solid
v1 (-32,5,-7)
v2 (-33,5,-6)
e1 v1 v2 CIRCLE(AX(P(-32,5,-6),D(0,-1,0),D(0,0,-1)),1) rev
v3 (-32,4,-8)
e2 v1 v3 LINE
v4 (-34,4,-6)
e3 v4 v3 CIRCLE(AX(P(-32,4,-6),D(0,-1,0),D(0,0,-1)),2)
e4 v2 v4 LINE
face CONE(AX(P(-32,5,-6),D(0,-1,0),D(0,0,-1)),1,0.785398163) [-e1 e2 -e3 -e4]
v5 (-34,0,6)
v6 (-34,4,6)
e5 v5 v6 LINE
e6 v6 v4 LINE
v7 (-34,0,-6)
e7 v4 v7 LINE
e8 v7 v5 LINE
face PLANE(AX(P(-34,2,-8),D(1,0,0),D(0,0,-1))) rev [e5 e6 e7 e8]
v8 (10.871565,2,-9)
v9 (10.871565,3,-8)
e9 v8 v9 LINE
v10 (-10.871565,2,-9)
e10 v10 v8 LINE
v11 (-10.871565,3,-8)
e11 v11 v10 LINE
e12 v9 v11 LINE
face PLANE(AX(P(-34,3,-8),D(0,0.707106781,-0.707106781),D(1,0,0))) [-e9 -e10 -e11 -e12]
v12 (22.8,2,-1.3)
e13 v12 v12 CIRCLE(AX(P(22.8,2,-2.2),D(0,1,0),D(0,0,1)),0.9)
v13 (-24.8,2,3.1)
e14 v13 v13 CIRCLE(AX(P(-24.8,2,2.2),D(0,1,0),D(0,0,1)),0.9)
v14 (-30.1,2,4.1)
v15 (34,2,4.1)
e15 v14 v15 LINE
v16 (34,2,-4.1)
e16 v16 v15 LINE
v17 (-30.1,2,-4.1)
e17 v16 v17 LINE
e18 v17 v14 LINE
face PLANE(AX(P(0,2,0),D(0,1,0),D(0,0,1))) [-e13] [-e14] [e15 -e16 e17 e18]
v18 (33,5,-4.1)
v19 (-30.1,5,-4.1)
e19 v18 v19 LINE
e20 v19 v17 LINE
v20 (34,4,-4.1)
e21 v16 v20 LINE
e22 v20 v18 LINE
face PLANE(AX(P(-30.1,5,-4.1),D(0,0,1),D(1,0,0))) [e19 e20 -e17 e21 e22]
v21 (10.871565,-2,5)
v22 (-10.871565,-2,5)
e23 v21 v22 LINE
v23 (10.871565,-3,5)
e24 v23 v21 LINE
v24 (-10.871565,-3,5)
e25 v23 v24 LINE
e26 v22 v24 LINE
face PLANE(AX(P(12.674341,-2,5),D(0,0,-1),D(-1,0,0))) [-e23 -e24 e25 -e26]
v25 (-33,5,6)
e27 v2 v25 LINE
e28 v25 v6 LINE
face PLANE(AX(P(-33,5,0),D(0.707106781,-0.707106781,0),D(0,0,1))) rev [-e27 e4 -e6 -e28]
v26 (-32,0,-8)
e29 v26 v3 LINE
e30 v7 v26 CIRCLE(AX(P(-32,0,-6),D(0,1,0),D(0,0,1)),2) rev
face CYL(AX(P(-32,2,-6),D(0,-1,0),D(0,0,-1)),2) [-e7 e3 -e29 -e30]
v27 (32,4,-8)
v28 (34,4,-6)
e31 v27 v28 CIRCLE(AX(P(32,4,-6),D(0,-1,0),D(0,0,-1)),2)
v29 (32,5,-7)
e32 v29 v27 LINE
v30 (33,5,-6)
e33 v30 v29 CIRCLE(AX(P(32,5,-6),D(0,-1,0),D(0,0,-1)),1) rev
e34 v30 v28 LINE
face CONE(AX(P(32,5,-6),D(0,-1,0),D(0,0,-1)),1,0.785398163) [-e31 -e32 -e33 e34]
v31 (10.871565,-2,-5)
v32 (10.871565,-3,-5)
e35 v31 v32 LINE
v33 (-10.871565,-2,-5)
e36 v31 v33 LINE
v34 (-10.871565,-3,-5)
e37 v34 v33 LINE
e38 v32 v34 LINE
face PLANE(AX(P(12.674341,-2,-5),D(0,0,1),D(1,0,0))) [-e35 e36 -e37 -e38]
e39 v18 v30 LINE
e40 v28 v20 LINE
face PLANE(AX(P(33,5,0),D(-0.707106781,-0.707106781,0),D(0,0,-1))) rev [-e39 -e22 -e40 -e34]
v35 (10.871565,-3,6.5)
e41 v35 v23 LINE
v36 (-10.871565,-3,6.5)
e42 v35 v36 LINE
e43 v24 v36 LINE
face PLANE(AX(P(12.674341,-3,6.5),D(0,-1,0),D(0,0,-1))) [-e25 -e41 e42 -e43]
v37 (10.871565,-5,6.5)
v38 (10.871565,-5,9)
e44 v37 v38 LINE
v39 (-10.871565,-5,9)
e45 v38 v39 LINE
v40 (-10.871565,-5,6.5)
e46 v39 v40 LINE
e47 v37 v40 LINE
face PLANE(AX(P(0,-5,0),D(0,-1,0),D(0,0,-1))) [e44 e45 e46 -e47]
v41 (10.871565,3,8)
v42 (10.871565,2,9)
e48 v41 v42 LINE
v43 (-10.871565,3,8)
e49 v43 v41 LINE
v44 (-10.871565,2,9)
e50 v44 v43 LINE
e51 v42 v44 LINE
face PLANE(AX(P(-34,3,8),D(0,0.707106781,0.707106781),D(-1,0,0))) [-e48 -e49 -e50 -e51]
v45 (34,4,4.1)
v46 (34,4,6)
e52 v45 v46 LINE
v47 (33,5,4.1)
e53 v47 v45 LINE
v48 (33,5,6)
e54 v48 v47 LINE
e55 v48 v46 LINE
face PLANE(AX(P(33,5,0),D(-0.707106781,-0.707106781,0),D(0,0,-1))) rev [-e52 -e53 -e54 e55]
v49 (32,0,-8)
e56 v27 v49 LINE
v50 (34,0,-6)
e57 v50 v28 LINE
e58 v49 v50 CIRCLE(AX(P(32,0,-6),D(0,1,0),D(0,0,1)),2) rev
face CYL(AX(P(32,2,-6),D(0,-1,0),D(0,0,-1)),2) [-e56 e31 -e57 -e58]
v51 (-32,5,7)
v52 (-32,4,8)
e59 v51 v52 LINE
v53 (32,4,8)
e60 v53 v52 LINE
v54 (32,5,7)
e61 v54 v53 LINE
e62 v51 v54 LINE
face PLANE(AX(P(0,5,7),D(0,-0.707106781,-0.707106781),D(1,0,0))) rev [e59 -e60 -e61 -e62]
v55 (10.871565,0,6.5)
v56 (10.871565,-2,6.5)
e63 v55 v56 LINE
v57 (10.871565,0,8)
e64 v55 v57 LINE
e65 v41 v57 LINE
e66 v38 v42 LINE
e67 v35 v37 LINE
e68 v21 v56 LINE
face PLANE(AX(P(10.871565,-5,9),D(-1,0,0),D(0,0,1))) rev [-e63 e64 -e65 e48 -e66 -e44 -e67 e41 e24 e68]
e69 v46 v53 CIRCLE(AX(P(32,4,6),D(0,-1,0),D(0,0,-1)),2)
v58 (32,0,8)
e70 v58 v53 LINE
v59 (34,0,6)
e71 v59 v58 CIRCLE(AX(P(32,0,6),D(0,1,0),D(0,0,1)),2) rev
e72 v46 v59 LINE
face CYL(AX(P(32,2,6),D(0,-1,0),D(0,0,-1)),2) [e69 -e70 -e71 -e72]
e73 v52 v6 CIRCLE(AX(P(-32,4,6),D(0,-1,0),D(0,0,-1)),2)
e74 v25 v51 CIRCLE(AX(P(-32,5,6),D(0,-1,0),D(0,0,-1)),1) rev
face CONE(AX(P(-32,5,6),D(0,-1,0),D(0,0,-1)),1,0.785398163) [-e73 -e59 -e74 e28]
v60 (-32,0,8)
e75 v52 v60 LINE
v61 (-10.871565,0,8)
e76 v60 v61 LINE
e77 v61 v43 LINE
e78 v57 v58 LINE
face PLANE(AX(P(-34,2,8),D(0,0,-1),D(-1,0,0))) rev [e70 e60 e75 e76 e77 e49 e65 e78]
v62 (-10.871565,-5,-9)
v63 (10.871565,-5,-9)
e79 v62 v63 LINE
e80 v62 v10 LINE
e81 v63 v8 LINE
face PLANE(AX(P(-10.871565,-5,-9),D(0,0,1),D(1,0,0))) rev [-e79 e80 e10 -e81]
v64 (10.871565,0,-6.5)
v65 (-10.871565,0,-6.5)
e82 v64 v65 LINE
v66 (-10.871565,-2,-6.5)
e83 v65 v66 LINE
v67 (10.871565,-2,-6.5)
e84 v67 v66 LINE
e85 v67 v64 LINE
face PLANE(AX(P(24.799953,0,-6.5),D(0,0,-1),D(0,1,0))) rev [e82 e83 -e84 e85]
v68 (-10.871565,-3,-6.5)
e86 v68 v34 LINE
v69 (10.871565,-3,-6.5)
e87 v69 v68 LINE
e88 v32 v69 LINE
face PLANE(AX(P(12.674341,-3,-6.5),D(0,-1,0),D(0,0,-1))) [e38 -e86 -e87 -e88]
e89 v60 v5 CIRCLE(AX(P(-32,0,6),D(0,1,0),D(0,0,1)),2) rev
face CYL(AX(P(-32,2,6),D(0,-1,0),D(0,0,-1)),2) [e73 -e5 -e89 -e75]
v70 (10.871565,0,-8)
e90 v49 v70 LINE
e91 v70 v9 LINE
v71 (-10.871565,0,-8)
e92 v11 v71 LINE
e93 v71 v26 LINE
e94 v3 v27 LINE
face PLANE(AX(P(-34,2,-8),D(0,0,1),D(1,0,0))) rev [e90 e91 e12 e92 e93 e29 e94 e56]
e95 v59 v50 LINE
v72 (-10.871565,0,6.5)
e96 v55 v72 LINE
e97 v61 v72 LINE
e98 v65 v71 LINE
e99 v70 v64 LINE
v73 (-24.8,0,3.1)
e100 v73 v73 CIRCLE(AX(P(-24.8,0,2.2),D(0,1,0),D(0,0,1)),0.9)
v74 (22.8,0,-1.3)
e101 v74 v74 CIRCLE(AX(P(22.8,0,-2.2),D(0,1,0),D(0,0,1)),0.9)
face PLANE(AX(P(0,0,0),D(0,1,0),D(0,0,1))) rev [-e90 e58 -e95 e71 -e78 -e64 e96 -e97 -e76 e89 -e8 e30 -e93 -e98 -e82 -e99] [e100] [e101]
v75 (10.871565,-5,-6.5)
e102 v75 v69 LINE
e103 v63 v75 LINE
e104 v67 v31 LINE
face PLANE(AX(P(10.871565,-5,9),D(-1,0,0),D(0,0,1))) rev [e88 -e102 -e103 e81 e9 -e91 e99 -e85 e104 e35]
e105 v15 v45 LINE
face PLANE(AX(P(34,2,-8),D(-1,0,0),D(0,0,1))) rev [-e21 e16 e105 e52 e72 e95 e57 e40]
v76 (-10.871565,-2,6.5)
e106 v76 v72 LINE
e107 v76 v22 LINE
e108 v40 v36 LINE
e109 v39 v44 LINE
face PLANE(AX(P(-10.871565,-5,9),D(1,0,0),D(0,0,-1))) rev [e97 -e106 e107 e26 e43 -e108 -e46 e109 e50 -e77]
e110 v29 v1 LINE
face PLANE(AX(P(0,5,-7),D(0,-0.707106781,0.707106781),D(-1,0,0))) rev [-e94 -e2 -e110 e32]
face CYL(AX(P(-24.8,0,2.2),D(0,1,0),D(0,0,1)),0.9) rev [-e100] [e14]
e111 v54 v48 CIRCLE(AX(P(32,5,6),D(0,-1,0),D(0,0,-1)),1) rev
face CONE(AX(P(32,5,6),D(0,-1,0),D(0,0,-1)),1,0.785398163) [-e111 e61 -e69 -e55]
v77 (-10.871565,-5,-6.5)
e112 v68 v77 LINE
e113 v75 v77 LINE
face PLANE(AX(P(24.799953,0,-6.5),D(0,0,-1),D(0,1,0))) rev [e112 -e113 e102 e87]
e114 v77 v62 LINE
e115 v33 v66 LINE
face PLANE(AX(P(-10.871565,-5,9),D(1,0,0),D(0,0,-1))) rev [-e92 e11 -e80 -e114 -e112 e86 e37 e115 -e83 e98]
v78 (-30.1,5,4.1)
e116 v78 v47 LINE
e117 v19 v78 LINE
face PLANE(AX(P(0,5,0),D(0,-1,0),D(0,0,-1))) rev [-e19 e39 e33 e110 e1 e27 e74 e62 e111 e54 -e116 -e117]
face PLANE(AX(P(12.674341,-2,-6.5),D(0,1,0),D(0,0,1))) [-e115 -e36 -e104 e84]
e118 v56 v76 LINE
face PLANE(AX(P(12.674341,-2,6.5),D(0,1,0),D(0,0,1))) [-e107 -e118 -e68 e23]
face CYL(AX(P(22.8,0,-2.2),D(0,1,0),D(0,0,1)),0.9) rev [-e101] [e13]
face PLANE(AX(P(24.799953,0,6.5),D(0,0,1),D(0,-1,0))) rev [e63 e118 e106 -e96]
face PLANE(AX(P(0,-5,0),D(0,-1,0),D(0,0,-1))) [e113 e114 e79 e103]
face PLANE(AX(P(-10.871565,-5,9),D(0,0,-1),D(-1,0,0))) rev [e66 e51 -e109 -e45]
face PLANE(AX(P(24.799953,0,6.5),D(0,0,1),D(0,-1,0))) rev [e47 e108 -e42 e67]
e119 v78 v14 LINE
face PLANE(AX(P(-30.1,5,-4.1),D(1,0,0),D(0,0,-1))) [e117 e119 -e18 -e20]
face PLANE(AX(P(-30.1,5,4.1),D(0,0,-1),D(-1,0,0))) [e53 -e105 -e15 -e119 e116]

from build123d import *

# Parameters (mm, degrees)
SKETCH2_W           = 68
SKETCH2_H           = 16
BOSS_EXTRUDE1_DEPTH = 2
SKETCH3_W           = 68
SKETCH3_H           = 16
SKETCH3_W_2         = 60.2
SKETCH3_H_2         = 8.2
BOSS_EXTRUDE2_DEPTH = 3
SKETCH4_R           = 0.9
CUT_EXTRUDE1_DEPTH  = 36.057096286
SKETCH5_W           = 21.74313044
SKETCH5_H           = 18
BOSS_EXTRUDE3_DEPTH = 5
SKETCH6_W           = 13
SKETCH6_H           = 5
CUT_EXTRUDE3_DEPTH  = 21.743130441
SKETCH7_W           = 1.5
SKETCH7_H           = 1
BOSS_EXTRUDE4_DEPTH = 21.743130441
CHAMFER1_SIZE       = 3
SKETCH8_W           = 3.9
SKETCH8_H           = 8.2
CUT_EXTRUDE4_DEPTH  = 3
FILLET1_R           = 2
CHAMFER2_SIZE       = 1


with BuildPart() as part:
    # Sketch2 → Boss-Extrude1 (new body)
    with BuildSketch(Plane(origin=(0, 0, 0), x_dir=(1, 0, 0), z_dir=(0, 1, 0))):
        Rectangle(SKETCH2_W, SKETCH2_H)
    extrude(amount=BOSS_EXTRUDE1_DEPTH)

    # Sketch3 → Boss-Extrude2 (add)
    with BuildSketch(Plane(origin=(0, 2, 0), x_dir=(1, 0, 0), z_dir=(0, 1, 0))):
        Rectangle(SKETCH3_W, SKETCH3_H)
        Rectangle(SKETCH3_W_2, SKETCH3_H_2, mode=Mode.SUBTRACT)
    extrude(amount=BOSS_EXTRUDE2_DEPTH)

    # Sketch4 → Cut-Extrude1 (cut, through all)
    with BuildSketch(Plane(origin=(0, 2, 0), x_dir=(1, 0, 0), z_dir=(0, 1, 0))):
        with Locations(Location((-24.8, -2.2, 0), (0, 0, 270))):
            Circle(SKETCH4_R)
        with Locations(Location((22.8, 2.2, 0), (0, 0, 270))):
            Circle(SKETCH4_R)
    extrude(amount=-CUT_EXTRUDE1_DEPTH, mode=Mode.SUBTRACT)

    # Sketch5 → Boss-Extrude3 (add)
    with BuildSketch(Plane.XZ):
        Rectangle(SKETCH5_W, SKETCH5_H)
    extrude(amount=BOSS_EXTRUDE3_DEPTH)

    # Sketch6 → Cut-Extrude3 (cut)
    with BuildSketch(Plane.ZY.offset(10.87156522)):
        with Locations((0, -2.5)):
            Rectangle(SKETCH6_W, SKETCH6_H)
    extrude(amount=-CUT_EXTRUDE3_DEPTH, mode=Mode.SUBTRACT)

    # Sketch7 → Boss-Extrude4 (add)
    with BuildSketch(Plane.ZY.offset(10.87156522)):
        with Locations((-5.75, -2.5)):
            Rectangle(SKETCH7_W, SKETCH7_H)
        with Locations((5.75, -2.5)):
            Rectangle(SKETCH7_W, SKETCH7_H)
    extrude(amount=-BOSS_EXTRUDE4_DEPTH)

    # Chamfer1
    # the kernel refuses this chamfer: 3 mm, written as the material it adds along each edge
    with BuildSketch(Plane(origin=(10.87156522, 0, 8), x_dir=(0, 0.9996219169112968, -0.02749587661058649), z_dir=(-1, 0, 0))) as chamfer1_piece_1_section:
        Polygon((CHAMFER1_SIZE * 0.999621916911, -CHAMFER1_SIZE * 0.0274958766106), (-CHAMFER1_SIZE * 0.0274958766106, -CHAMFER1_SIZE * 0.999621916911), (0, 0), align=None)
    chamfer1_piece_1 = extrude(amount=21.743130441, mode=Mode.PRIVATE)
    chamfer1_piece_1 = split(chamfer1_piece_1, bisect_by=Plane(origin=(0, 1.266666667, 9), z_dir=(0, 0, -1)), keep=Keep.TOP, mode=Mode.PRIVATE)
    add(chamfer1_piece_1)
    with BuildSketch(Plane(origin=(-10.87156522, 0, -8), x_dir=(0, 0.9996219169112968, 0.02749587661058649), z_dir=(1, 0, 0))) as chamfer1_piece_2_section:
        Polygon((CHAMFER1_SIZE * 0.999621916911, -CHAMFER1_SIZE * 0.0274958766106), (-CHAMFER1_SIZE * 0.0274958766106, -CHAMFER1_SIZE * 0.999621916911), (0, 0), align=None)
    chamfer1_piece_2 = extrude(amount=21.743130441, mode=Mode.PRIVATE)
    chamfer1_piece_2 = split(chamfer1_piece_2, bisect_by=Plane(origin=(0, 1.266666667, -9), z_dir=(0, 0, 1)), keep=Keep.TOP, mode=Mode.PRIVATE)
    add(chamfer1_piece_2)

    # Sketch8 → Cut-Extrude4 (cut)
    with BuildSketch(Plane(origin=(0, 5, 0), x_dir=(1, 0, 0), z_dir=(0, 1, 0))):
        with Locations((32.05, 0)):
            Rectangle(SKETCH8_W, SKETCH8_H)
    extrude(amount=-CUT_EXTRUDE4_DEPTH, mode=Mode.SUBTRACT)

    # Fillet1
    fillet1_edges = [part.edges().sort_by_distance(p)[0] for p in [
        (34, 2.5, 8),
        (-34, 2.5, 8),
        (-34, 2.5, -8),
        (34, 2.5, -8),
    ]]
    fillet(fillet1_edges, radius=FILLET1_R)

    # Chamfer2
    chamfer2_edges = [part.edges().sort_by_distance(p)[0] for p in [
        (34, 5, -5.05),
        (34, 5, 5.05),
        (0, 5, 8),
        (0, 5, -8),
        (-34, 5, 0),
        (-33.414213562, 5, 7.414213562),
        (-33.414213562, 5, -7.414213562),
        (33.414213562, 5, -7.414213562),
        (33.414213562, 5, 7.414213562),
    ]]
    chamfer(chamfer2_edges, length=CHAMFER2_SIZE)


solid = part.part
